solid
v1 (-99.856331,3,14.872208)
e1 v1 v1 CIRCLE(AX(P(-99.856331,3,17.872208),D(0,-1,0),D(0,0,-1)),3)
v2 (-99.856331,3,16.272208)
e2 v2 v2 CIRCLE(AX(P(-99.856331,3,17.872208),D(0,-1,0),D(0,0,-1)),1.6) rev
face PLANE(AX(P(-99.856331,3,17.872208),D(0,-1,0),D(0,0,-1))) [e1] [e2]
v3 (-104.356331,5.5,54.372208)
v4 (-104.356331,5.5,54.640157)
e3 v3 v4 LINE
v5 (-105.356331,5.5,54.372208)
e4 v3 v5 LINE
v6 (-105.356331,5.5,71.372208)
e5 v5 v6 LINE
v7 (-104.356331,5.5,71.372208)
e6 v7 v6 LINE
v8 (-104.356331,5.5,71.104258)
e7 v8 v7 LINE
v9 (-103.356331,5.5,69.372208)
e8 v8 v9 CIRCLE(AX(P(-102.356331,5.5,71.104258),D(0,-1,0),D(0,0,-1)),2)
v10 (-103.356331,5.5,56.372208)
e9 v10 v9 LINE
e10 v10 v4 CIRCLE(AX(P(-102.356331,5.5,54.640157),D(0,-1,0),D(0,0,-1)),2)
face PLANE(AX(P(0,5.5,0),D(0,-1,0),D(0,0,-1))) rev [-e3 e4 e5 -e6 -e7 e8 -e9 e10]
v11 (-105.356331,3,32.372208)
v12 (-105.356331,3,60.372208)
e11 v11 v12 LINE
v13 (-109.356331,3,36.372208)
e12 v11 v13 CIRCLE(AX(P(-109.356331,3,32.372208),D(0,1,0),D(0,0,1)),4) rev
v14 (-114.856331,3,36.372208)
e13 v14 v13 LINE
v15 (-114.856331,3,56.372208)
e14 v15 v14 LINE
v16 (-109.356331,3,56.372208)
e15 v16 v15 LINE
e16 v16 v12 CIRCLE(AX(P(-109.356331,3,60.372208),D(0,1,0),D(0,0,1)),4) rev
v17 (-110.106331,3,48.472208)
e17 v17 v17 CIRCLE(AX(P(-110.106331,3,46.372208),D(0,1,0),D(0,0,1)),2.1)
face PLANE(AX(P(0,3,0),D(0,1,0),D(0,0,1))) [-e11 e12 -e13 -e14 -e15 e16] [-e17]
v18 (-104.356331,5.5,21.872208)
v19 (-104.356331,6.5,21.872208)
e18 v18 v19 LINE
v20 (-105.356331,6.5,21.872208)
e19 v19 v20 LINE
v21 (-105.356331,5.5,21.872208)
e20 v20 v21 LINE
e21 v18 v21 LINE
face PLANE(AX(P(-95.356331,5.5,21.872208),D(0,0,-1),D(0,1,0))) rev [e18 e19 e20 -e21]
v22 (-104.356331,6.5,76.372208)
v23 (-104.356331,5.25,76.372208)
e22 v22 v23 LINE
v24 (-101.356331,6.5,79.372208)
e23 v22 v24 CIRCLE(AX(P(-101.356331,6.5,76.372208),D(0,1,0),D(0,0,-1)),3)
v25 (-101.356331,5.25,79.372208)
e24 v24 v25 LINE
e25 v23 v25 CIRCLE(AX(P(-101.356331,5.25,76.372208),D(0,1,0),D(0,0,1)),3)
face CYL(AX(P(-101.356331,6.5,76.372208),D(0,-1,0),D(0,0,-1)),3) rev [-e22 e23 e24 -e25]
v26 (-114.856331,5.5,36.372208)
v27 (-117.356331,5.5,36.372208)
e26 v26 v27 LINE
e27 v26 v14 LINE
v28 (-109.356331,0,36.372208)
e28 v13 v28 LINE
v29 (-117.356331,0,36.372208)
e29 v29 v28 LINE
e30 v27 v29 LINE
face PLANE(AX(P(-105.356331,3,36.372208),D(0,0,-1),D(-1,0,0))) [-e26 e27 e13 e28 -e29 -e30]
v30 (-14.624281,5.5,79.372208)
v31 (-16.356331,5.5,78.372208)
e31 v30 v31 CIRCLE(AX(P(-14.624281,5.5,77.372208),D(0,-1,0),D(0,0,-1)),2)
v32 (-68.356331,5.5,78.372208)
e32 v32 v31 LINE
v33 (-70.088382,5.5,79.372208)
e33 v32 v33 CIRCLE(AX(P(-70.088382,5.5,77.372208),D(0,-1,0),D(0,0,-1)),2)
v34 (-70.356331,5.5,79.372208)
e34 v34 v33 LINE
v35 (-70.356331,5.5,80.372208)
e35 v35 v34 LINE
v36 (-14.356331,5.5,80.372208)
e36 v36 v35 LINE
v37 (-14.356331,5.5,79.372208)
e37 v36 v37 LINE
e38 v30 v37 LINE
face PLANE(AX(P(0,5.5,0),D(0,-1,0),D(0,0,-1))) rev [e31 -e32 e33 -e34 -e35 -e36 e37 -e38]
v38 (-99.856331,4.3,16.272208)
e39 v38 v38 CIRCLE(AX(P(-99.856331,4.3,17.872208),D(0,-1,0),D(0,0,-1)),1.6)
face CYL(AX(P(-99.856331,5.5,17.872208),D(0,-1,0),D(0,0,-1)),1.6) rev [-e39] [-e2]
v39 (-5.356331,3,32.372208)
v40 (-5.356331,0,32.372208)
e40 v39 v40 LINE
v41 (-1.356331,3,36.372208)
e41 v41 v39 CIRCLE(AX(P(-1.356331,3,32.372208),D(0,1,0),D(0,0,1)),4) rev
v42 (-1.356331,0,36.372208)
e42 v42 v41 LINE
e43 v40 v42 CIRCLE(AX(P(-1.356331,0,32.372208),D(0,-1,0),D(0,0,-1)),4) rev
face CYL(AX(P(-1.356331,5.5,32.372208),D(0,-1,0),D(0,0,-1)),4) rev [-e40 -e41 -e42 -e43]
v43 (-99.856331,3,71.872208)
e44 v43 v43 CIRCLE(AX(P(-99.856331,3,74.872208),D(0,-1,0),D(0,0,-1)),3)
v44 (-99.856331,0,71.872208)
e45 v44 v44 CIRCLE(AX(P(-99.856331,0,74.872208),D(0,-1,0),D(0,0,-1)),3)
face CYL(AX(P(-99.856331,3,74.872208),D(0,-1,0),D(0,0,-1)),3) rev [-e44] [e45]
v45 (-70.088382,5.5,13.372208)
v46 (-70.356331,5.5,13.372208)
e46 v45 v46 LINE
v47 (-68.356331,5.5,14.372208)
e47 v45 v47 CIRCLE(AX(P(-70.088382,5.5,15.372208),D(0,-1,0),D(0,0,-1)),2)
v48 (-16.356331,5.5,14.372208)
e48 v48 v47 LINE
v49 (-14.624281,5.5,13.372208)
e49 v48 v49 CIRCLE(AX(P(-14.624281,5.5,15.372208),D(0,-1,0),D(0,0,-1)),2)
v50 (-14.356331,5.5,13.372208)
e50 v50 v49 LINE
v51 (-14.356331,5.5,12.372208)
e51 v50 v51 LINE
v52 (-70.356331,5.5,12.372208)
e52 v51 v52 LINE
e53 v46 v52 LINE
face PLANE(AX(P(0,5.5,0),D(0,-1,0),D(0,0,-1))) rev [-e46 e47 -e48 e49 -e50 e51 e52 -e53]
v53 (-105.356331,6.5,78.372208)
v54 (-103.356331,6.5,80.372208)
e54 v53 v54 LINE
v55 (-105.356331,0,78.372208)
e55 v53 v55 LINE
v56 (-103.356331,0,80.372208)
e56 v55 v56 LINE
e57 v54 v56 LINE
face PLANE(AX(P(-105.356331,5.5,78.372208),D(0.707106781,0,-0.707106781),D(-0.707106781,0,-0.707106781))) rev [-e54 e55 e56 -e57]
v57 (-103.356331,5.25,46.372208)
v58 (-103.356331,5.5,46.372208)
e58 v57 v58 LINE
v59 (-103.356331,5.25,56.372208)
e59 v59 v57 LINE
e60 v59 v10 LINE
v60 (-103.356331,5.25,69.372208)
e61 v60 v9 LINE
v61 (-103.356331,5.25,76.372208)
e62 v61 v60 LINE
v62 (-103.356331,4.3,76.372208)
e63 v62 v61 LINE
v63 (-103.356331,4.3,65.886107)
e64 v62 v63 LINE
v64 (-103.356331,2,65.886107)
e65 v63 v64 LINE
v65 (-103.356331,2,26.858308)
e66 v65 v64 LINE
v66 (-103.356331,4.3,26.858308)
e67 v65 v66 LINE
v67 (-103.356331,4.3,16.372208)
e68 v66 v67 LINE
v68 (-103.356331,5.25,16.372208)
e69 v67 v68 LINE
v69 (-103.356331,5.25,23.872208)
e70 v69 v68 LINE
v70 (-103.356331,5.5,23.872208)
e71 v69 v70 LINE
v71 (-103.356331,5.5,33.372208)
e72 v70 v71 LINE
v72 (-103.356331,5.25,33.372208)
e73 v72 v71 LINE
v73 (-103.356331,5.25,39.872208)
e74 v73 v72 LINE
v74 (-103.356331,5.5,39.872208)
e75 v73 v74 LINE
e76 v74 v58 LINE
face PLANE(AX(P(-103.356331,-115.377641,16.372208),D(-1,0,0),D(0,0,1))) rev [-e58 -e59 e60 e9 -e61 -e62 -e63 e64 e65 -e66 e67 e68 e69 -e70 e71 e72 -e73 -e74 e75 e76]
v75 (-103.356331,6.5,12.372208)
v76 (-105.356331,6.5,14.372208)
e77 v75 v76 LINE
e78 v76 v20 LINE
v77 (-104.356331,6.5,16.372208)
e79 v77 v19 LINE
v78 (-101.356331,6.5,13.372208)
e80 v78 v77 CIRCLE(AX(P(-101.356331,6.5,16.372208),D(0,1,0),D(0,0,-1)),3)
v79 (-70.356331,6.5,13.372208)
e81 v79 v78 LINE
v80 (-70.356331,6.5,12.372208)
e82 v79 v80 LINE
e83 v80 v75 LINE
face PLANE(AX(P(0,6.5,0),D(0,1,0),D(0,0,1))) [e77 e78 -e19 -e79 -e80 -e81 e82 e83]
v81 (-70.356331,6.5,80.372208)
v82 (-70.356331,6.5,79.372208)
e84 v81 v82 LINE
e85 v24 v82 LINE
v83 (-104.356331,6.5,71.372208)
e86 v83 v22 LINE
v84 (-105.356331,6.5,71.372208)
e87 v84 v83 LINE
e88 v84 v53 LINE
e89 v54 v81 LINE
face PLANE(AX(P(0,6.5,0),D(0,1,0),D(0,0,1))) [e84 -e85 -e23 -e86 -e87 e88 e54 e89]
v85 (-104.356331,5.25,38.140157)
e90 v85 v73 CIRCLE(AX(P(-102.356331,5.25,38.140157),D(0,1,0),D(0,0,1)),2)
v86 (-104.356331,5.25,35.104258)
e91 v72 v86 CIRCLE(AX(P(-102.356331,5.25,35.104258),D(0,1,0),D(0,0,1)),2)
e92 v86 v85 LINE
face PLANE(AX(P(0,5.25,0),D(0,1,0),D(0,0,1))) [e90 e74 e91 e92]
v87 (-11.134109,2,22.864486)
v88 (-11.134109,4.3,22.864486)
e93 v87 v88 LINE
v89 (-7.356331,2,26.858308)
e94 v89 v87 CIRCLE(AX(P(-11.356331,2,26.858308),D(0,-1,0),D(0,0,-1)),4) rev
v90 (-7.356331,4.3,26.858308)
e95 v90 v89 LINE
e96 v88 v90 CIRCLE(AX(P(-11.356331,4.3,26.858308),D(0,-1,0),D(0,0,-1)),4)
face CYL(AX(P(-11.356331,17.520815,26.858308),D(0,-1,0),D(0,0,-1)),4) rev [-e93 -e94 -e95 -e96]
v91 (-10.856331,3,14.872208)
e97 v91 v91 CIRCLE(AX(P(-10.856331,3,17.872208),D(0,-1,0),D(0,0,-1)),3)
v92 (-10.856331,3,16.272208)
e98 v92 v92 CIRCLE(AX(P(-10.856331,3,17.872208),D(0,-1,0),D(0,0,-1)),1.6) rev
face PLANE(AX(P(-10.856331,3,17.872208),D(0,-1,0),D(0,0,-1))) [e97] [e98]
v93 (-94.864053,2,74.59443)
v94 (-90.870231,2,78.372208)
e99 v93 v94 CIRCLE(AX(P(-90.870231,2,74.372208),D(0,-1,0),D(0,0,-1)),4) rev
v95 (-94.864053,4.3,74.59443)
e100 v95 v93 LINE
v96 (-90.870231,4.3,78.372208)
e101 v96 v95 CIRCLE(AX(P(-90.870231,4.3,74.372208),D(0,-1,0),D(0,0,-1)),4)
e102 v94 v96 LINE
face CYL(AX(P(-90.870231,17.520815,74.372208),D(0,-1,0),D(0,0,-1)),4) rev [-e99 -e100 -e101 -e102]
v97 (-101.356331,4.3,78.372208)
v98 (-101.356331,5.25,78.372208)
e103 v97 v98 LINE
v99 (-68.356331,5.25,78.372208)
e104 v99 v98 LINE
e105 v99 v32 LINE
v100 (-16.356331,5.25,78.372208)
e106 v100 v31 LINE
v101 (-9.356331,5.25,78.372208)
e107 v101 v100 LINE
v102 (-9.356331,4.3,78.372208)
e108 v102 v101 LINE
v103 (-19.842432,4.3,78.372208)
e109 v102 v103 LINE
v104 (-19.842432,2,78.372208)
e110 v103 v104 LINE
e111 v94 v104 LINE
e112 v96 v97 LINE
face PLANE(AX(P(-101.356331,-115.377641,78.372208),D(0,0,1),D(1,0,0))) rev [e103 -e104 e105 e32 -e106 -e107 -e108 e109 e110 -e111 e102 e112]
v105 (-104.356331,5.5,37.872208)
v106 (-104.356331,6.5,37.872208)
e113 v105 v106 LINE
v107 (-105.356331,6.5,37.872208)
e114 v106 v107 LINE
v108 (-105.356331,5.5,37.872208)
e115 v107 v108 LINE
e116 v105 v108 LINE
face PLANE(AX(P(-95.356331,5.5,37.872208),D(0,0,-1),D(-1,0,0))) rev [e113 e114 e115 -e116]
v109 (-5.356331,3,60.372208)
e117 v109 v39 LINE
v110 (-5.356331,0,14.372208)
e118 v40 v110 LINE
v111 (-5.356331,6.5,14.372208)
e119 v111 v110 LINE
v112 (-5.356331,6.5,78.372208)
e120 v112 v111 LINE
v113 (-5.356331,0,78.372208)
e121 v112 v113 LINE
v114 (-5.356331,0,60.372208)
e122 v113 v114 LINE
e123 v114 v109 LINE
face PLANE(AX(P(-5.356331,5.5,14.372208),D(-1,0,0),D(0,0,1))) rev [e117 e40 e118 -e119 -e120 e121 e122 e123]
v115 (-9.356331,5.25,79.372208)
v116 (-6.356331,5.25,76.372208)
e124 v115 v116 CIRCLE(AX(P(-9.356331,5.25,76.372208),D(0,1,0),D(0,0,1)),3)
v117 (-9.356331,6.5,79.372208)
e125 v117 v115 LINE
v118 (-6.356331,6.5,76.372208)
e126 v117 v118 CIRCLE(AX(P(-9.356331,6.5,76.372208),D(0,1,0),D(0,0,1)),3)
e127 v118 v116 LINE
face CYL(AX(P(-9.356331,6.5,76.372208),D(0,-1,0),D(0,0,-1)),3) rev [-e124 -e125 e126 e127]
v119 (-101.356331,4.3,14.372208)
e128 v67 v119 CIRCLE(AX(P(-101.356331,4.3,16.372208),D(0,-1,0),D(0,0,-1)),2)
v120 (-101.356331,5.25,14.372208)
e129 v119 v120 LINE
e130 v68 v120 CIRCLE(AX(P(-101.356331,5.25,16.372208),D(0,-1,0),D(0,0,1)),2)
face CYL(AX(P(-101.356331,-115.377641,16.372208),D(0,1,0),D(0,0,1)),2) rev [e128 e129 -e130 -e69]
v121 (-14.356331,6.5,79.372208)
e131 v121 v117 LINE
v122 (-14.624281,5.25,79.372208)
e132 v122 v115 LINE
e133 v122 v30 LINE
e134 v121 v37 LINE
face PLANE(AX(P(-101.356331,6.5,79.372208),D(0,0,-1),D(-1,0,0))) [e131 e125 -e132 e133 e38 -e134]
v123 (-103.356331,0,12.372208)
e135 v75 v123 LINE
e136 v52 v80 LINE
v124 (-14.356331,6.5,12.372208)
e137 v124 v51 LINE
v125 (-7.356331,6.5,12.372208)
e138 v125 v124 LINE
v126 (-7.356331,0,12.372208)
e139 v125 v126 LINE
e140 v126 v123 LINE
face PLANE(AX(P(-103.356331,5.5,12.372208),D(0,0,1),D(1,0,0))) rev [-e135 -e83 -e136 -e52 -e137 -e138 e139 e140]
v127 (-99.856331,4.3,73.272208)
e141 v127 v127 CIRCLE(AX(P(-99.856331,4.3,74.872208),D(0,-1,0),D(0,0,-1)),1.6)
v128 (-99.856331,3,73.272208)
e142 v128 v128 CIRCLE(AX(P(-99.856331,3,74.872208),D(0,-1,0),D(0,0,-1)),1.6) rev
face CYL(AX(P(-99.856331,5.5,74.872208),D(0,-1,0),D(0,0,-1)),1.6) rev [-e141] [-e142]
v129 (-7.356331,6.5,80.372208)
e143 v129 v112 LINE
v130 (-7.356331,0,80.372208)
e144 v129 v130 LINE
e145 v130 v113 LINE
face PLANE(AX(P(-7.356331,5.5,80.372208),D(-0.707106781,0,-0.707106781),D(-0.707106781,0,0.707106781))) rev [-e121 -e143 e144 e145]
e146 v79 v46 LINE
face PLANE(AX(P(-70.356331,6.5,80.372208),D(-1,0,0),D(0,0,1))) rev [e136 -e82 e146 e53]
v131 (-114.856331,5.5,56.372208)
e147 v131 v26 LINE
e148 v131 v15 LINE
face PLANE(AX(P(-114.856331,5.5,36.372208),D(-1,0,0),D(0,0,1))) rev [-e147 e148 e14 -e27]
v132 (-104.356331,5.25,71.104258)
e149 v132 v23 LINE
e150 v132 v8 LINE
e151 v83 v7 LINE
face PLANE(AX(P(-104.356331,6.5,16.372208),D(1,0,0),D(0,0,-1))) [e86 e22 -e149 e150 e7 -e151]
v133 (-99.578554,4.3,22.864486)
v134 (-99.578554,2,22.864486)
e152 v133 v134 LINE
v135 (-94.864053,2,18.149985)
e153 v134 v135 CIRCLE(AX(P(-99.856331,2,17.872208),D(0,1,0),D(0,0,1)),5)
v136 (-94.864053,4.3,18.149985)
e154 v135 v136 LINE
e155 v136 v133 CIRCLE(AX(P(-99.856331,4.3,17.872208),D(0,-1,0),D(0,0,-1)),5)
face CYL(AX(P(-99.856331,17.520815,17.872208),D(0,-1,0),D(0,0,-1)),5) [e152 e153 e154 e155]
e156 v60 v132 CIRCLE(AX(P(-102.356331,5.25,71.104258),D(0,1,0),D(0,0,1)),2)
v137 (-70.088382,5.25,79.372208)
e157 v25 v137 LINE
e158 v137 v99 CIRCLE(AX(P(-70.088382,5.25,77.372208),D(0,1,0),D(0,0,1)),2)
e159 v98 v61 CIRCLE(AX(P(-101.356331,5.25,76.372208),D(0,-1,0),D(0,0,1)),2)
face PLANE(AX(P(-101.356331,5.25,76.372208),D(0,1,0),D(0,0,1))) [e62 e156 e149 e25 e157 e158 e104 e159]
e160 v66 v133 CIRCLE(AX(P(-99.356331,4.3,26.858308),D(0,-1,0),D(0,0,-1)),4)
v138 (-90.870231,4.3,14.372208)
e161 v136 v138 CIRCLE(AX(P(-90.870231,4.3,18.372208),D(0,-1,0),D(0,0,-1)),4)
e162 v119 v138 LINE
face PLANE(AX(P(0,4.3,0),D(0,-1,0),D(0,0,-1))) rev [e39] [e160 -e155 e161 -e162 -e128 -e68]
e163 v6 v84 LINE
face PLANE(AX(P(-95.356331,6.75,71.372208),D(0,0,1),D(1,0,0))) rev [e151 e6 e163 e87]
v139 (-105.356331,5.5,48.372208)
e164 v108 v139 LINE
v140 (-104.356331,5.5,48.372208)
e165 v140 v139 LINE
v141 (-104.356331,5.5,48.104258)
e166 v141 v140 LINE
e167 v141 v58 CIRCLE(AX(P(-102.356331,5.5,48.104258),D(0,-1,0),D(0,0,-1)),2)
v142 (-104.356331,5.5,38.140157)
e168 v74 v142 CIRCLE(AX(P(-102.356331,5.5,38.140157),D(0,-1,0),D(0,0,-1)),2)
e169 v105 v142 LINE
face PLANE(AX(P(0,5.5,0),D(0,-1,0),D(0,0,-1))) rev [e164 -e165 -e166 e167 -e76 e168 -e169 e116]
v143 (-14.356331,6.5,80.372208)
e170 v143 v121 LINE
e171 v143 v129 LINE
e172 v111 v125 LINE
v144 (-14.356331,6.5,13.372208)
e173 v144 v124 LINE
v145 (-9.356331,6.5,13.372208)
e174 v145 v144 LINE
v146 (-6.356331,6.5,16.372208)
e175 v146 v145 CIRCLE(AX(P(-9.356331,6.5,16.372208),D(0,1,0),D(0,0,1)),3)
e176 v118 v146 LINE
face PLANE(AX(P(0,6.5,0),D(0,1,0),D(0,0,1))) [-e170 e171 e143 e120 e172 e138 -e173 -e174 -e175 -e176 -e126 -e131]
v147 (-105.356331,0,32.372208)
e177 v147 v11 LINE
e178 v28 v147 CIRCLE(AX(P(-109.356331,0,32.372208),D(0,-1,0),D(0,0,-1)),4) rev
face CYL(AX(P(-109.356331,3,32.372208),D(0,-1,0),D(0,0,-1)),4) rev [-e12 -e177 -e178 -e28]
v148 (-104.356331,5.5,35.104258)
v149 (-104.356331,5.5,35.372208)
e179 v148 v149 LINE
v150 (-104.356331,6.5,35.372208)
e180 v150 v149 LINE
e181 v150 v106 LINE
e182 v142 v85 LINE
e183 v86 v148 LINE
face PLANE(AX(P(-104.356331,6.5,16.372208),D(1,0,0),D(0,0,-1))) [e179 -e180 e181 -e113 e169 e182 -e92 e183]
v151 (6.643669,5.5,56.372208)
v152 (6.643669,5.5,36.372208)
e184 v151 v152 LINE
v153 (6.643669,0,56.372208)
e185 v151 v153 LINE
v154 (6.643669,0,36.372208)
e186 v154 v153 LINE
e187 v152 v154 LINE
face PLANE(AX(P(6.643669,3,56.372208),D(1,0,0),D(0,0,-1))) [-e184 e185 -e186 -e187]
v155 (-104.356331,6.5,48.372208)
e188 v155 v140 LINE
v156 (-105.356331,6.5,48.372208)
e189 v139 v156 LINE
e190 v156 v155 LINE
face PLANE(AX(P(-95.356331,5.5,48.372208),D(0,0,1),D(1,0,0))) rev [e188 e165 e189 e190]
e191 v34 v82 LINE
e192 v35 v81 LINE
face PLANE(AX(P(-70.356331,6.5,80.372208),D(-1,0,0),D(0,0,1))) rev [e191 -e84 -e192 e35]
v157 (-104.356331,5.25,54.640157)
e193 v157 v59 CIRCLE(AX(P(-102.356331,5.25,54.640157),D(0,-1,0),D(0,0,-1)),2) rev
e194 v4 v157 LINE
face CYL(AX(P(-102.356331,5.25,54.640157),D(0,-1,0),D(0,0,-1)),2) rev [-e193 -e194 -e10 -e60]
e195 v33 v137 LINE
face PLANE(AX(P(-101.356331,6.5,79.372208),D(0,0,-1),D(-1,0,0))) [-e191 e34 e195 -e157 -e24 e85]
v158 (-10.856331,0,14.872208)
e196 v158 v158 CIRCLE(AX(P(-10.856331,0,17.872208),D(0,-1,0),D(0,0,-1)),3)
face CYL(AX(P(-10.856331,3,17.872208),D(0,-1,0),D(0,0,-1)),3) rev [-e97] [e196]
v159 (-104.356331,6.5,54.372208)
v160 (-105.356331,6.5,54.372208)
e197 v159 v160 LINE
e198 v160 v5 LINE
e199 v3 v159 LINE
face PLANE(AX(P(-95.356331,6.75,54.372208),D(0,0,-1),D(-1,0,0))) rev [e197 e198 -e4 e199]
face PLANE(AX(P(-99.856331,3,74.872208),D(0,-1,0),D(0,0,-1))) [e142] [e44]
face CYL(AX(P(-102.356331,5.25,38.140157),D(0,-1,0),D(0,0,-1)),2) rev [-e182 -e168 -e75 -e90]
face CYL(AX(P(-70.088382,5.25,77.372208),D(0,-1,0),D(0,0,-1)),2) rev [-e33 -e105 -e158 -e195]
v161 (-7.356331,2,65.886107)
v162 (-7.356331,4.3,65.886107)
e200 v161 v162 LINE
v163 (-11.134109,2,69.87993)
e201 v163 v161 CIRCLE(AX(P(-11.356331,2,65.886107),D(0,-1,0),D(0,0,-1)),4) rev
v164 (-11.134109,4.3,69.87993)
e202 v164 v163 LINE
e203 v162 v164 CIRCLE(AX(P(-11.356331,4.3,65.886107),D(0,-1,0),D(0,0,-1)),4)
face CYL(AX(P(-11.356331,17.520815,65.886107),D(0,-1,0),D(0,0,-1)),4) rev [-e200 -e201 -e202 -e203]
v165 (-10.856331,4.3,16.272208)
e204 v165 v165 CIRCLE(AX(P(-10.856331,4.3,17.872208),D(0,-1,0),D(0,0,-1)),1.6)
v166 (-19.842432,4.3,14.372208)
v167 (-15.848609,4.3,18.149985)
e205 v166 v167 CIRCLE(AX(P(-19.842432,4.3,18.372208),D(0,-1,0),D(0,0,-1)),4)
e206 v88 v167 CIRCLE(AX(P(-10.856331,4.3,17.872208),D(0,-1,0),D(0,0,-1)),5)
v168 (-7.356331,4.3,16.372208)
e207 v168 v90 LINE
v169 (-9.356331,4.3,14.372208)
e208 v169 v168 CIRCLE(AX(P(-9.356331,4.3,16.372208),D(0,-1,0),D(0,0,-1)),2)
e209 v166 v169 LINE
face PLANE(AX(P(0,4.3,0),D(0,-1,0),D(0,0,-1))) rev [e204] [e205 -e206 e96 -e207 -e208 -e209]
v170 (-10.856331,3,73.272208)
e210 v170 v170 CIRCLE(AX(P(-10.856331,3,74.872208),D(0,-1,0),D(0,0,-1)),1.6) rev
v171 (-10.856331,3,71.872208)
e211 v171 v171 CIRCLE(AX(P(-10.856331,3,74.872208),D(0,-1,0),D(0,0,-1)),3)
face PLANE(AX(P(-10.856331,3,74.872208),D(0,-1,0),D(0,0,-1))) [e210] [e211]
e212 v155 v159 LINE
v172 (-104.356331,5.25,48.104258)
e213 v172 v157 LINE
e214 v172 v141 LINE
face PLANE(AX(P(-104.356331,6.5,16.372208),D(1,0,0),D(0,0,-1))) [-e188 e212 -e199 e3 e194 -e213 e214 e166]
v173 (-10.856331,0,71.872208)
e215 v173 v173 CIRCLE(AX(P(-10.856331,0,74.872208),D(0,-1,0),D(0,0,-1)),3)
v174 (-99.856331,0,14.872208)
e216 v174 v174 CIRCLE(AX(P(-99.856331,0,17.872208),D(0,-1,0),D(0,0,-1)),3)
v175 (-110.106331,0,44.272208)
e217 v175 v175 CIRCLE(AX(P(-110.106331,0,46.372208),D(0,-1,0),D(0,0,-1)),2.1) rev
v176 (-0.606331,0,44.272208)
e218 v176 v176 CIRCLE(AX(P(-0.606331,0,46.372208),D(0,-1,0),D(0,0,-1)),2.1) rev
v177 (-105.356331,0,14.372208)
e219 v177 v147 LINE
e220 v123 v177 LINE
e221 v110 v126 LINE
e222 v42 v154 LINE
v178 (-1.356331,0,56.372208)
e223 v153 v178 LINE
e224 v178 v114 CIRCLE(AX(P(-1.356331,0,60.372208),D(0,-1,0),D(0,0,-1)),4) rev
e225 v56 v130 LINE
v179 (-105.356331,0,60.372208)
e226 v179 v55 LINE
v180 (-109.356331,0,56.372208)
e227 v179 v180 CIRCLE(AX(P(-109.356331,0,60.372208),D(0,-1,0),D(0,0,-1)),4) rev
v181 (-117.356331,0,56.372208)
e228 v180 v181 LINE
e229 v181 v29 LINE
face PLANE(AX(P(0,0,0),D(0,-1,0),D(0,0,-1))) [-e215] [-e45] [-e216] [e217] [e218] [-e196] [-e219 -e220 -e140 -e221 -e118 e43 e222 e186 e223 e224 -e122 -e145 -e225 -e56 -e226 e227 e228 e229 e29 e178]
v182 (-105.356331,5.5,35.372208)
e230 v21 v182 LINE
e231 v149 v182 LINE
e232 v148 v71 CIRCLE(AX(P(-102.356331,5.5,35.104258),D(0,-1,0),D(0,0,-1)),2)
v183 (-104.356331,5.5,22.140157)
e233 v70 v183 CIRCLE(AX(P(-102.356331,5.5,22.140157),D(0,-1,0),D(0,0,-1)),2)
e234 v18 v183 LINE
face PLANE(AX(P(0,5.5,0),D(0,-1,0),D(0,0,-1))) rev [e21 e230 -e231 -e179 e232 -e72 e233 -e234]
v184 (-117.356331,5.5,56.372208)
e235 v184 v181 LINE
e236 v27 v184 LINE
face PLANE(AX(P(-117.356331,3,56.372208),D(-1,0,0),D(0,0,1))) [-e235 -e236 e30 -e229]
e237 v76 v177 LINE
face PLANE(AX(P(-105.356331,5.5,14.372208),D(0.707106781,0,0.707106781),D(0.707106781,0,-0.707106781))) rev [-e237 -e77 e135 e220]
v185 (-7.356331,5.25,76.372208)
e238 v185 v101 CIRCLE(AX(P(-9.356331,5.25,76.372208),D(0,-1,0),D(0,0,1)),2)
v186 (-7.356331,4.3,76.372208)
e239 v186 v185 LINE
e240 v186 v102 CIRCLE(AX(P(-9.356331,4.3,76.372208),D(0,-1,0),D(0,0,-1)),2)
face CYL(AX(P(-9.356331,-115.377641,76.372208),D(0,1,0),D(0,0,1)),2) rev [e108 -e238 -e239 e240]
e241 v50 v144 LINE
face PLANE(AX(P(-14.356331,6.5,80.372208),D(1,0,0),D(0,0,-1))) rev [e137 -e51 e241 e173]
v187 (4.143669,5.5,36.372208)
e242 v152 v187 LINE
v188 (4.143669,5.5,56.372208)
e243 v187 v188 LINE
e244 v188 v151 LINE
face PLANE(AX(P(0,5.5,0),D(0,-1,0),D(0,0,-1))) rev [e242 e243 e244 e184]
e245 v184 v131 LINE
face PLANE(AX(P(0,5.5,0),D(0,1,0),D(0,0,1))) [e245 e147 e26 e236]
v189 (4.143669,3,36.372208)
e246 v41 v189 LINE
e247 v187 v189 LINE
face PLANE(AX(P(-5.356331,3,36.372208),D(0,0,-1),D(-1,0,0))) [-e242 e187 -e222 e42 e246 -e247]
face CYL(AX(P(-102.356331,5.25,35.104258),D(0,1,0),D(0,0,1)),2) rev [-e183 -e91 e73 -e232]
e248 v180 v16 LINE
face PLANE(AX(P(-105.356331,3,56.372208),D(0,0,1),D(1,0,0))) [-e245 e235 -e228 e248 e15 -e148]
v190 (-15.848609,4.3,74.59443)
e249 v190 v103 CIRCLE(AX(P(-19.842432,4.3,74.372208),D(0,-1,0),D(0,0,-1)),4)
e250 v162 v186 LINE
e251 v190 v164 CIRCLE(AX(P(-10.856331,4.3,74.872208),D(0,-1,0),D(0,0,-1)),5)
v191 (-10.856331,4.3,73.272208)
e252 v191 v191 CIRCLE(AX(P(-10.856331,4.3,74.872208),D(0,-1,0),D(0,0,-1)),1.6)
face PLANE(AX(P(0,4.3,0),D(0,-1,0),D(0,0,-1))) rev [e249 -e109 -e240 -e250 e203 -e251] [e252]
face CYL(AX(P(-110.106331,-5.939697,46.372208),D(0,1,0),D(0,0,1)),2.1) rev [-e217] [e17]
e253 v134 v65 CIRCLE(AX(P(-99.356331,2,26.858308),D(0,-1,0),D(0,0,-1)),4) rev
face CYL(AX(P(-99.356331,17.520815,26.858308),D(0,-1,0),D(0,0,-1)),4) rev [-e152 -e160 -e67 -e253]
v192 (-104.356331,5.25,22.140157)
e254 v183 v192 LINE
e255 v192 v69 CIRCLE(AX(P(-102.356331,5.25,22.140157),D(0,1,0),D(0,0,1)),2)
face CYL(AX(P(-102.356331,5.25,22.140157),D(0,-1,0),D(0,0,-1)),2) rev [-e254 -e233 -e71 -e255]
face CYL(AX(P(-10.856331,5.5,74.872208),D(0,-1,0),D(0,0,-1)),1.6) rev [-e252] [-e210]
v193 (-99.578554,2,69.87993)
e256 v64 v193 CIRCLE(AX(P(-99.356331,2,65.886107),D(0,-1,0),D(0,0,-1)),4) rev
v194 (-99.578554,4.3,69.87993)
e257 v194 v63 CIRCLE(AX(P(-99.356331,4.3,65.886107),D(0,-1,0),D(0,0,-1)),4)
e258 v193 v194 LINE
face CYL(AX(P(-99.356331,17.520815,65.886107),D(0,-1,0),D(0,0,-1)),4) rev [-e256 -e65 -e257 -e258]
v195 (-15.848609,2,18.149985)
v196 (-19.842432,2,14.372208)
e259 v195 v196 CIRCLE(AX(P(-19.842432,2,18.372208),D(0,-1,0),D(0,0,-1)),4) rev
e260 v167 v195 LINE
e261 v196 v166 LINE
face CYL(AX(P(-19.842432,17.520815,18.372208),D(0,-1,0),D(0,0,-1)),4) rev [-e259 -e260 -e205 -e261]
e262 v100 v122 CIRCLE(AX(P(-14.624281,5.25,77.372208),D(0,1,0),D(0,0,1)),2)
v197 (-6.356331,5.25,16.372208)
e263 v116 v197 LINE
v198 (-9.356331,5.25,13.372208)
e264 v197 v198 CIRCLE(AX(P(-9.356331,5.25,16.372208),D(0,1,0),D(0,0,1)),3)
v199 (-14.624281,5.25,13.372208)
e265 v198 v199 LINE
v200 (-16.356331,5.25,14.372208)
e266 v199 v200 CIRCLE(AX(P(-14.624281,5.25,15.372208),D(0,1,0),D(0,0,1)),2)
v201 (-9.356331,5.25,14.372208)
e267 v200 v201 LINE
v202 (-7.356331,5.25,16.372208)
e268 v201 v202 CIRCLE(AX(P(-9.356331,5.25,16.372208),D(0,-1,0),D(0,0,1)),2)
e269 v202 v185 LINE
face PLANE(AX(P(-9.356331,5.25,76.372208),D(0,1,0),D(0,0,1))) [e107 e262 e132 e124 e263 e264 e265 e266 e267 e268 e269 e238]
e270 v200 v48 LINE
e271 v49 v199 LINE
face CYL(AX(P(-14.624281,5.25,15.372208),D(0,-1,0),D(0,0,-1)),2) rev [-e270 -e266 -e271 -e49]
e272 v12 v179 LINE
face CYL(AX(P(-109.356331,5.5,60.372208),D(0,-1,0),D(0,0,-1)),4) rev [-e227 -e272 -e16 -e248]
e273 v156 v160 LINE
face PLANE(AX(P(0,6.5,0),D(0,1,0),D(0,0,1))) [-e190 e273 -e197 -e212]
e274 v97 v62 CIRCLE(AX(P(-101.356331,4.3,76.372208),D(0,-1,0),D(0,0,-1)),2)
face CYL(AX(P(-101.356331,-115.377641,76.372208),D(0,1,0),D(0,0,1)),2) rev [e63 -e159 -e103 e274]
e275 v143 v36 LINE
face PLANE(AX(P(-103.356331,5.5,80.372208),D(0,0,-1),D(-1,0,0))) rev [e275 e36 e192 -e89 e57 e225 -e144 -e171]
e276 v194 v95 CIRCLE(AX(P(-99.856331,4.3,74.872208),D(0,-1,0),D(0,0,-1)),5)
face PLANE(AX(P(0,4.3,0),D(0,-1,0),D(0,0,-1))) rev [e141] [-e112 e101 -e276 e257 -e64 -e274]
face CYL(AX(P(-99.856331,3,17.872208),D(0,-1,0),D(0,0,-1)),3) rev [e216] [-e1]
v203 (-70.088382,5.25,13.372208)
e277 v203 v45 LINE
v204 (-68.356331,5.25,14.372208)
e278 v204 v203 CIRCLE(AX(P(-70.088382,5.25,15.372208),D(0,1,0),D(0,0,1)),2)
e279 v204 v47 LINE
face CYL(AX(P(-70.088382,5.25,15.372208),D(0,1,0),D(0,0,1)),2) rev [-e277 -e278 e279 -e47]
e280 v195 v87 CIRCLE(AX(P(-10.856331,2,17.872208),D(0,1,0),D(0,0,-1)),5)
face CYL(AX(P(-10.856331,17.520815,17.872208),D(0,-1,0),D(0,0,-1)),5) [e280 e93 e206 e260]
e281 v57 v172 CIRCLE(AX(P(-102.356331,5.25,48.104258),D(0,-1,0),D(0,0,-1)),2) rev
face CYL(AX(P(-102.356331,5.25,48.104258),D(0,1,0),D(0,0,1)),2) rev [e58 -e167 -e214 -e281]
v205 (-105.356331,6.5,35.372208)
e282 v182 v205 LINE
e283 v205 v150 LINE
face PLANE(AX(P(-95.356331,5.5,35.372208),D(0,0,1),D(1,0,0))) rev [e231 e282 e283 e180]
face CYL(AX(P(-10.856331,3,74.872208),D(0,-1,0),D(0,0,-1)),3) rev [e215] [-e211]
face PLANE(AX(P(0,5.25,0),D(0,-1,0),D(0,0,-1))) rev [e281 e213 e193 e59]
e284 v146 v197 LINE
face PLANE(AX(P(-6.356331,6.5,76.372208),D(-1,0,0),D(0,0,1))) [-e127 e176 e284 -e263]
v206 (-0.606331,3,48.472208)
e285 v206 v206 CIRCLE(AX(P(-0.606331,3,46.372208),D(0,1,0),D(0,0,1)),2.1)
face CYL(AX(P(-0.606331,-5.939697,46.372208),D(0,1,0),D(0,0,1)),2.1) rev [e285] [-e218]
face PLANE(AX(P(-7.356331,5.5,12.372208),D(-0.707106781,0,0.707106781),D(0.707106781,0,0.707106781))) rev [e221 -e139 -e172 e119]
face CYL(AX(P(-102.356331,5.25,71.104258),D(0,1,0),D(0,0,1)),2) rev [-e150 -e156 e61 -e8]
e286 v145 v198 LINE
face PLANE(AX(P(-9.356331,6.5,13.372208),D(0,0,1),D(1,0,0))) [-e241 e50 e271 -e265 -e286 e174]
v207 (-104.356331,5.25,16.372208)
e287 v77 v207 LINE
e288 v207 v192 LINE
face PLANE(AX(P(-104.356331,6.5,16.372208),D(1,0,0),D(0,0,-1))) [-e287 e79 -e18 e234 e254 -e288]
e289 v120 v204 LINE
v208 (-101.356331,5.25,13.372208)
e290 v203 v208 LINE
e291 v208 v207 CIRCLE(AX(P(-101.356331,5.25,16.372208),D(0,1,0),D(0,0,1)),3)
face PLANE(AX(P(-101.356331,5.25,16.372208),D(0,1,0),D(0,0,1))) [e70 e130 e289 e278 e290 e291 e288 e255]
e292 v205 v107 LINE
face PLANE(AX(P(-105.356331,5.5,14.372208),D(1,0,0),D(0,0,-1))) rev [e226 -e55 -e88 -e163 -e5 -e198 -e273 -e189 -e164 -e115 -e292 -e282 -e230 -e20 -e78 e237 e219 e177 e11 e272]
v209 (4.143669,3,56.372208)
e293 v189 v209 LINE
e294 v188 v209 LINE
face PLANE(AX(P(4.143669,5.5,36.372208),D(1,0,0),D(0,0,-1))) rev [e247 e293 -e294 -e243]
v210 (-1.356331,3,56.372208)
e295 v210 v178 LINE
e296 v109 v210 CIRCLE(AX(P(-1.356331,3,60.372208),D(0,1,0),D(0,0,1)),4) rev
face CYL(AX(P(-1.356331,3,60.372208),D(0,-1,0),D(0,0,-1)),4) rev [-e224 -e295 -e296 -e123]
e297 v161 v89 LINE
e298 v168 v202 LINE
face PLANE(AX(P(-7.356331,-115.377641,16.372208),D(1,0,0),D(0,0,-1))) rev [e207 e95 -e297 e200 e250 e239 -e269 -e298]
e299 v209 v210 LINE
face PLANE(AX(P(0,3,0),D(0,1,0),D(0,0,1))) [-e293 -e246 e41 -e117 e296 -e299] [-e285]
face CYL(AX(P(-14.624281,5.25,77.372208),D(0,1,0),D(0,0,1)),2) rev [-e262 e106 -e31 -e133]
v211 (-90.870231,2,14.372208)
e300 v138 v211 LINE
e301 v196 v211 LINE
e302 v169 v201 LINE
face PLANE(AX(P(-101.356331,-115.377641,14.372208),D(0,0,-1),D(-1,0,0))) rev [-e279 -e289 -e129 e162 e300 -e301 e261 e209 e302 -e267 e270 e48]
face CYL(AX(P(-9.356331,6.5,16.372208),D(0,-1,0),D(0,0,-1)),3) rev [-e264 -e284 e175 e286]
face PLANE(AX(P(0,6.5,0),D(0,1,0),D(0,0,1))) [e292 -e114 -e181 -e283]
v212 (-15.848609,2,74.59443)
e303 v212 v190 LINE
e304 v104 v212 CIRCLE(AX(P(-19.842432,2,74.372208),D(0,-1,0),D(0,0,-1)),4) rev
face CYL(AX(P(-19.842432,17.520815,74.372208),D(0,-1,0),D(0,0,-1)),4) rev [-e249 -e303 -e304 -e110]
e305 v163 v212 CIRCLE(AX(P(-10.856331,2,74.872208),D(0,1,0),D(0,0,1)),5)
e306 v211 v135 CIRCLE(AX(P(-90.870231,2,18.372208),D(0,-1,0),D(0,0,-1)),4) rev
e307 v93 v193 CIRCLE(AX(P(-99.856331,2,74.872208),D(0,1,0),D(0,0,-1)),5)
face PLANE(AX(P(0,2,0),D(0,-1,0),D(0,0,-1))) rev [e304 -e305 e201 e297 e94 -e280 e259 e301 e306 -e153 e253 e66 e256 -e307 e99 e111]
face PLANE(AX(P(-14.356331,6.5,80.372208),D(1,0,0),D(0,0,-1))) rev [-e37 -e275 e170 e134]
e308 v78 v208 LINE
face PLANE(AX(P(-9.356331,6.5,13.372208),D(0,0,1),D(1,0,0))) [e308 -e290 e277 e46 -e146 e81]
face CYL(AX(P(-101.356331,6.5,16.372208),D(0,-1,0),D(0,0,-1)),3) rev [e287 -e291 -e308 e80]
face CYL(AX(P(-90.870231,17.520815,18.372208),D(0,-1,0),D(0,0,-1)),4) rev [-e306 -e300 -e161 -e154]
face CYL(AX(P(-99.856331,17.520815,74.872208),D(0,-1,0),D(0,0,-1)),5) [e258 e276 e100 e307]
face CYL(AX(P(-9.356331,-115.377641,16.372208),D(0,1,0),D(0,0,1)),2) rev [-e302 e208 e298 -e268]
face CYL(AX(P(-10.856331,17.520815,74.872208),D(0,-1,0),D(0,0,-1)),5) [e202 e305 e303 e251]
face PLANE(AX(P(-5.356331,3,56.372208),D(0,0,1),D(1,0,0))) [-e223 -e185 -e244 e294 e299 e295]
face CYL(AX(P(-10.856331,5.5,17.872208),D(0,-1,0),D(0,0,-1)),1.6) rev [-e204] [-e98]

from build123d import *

# Parameters (mm, degrees)
BOSS_EXTRUDE1_DEPTH              = 5.5
PCB_BASIN_DEPTH                  = 3.5
PCB_START                        = 2.3
PCB_POSTS_DEPTH                  = 2.3
SKETCH4_R                        = 1.6
SCREW_HOLES_DEPTH                = 133.62691408
SKETCH6_R                        = 3
SCREW_CHAMFER_DEPTH              = 3
LIP_DEPTH                        = 1
BASIN_FILLET_R                   = 4
SKETCH12_W                       = 13.5
SKETCH12_H                       = 1.25
SKETCH12_W_2                     = 10.5
SKETCH12_W_3                     = 17
INTERFACE_CONNECTOR_CUTOUT_DEPTH = 10
SKETCH13_W                       = 56
SKETCH13_H                       = 1
POP_CONNECTOR_CUTOUT_DEPTH       = 126.563555911
CUT_EXTRUDE3_DEPTH               = 0.25
FILLET7_R                        = 2
SKETCH15_W                       = 12
SKETCH15_H                       = 20
MOUNTING_PEGS_DEPTH              = 3
MOUNTING_PEGS_FILLET_R           = 4
MOUNTING_PEG_LIPS_W              = 2.5
MOUNTING_PEG_LIPS_H              = 20
BOSS_EXTRUDE3_DEPTH              = 2.5
SKETCH17_R                       = 2.1
CUT_EXTRUDE4_DEPTH               = 3


with BuildPart() as part:
    # Sketch1 → Boss-Extrude1 (new body)
    with BuildSketch(Plane(origin=(0, 0, 0), x_dir=(1, 0, 0), z_dir=(0, 1, 0))):
        Polygon((-105.356331433, -14.372207668), (-103.356331433, -12.372207668), (-7.356331433, -12.372207668), (-5.356331433, -14.372207668), (-5.356331433, -78.372207668), (-7.356331433, -80.372207668), (-103.356331433, -80.372207668), (-105.356331433, -78.372207668), align=None)
    extrude(amount=BOSS_EXTRUDE1_DEPTH)

    # Sketch2 → pcb basin (cut)
    with BuildSketch(Plane(origin=(0, 5.5, 0), x_dir=(1, 0, 0), z_dir=(0, 1, 0))):
        with BuildLine():
            Line((-101.356331433, -14.372207668), (-9.356331433, -14.372207668))
            ThreePointArc((-9.356331433, -14.372207668), (-7.942117871, -14.957994106), (-7.356331433, -16.372207668))
            Line((-7.356331433, -16.372207668), (-7.356331433, -76.372207668))
            ThreePointArc((-7.356331433, -76.372207668), (-7.942117871, -77.78642123), (-9.356331433, -78.372207668))
            Line((-9.356331433, -78.372207668), (-101.356331433, -78.372207668))
            ThreePointArc((-101.356331433, -78.372207668), (-102.770544996, -77.78642123), (-103.356331433, -76.372207668))
            Line((-103.356331433, -76.372207668), (-103.356331433, -16.372207668))
            ThreePointArc((-103.356331433, -16.372207668), (-102.770544996, -14.957994106), (-101.356331433, -14.372207668))
        make_face()
    extrude(amount=-PCB_BASIN_DEPTH, mode=Mode.SUBTRACT)

    # Sketch3 → pcb posts (add)
    with BuildSketch(Plane(origin=(0, 2, 0), x_dir=(1, 0, 0), z_dir=(0, 1, 0)).offset(PCB_START)):
        with BuildLine():
            Line((-103.356331433, -69.872207668), (-99.856331433, -69.872207668))
            ThreePointArc((-99.856331433, -69.872207668), (-96.320797527, -71.336673762), (-94.856331433, -74.872207668))
            Line((-94.856331433, -74.872207668), (-94.856331433, -78.372207668))
            Line((-94.856331433, -78.372207668), (-101.356331433, -78.372207668))
            ThreePointArc((-101.356331433, -78.372207668), (-102.770544996, -77.78642123), (-103.356331433, -76.372207668))
            Line((-103.356331433, -76.372207668), (-103.356331433, -69.872207668))
        make_face()
        with BuildLine():
            Line((-7.356331433, -69.872207668), (-7.356331433, -76.372207668))
            ThreePointArc((-7.356331433, -76.372207668), (-7.942117871, -77.78642123), (-9.356331433, -78.372207668))
            Line((-9.356331433, -78.372207668), (-15.856331433, -78.372207668))
            Line((-15.856331433, -78.372207668), (-15.856331433, -74.872207668))
            ThreePointArc((-15.856331433, -74.872207668), (-14.391865339, -71.336673762), (-10.856331433, -69.872207668))
            Line((-10.856331433, -69.872207668), (-7.356331433, -69.872207668))
        make_face()
        with BuildLine():
            Line((-7.356331433, -22.872207668), (-10.856331433, -22.872207668))
            ThreePointArc((-10.856331433, -22.872207668), (-14.391865339, -21.407741574), (-15.856331433, -17.872207668))
            Line((-15.856331433, -17.872207668), (-15.856331433, -14.372207668))
            Line((-15.856331433, -14.372207668), (-9.356331433, -14.372207668))
            ThreePointArc((-9.356331433, -14.372207668), (-7.942117871, -14.957994106), (-7.356331433, -16.372207668))
            Line((-7.356331433, -16.372207668), (-7.356331433, -22.872207668))
        make_face()
        with BuildLine():
            Line((-103.356331433, -22.872207668), (-103.356331433, -16.372207668))
            ThreePointArc((-103.356331433, -16.372207668), (-102.770544996, -14.957994106), (-101.356331433, -14.372207668))
            Line((-101.356331433, -14.372207668), (-94.856331433, -14.372207668))
            Line((-94.856331433, -14.372207668), (-94.856331433, -17.872207668))
            ThreePointArc((-94.856331433, -17.872207668), (-96.320797527, -21.407741574), (-99.856331433, -22.872207668))
            Line((-99.856331433, -22.872207668), (-103.356331433, -22.872207668))
        make_face()
    extrude(amount=-PCB_POSTS_DEPTH)

    # Sketch4 → screw holes (cut, through all)
    with BuildSketch(Plane.XZ):
        with Locations(Location((-99.856331433, 17.872207668, 0), (0, 0, 270))):
            Circle(SKETCH4_R)
        with Locations(Location((-10.856331433, 17.872207668, 0), (0, 0, 270))):
            Circle(SKETCH4_R)
        with Locations(Location((-10.856331433, 74.872207668, 0), (0, 0, 270))):
            Circle(SKETCH4_R)
        with Locations(Location((-99.856331433, 74.872207668, 0), (0, 0, 270))):
            Circle(SKETCH4_R)
    extrude(amount=-SCREW_HOLES_DEPTH, mode=Mode.SUBTRACT)

    # Sketch6 → screw chamfer (cut)
    with BuildSketch(Plane.XZ):
        with Locations(Location((-99.856331433, 17.872207668, 0), (0, 0, 270))):
            Circle(SKETCH6_R)
        with Locations(Location((-10.856331433, 17.872207668, 0), (0, 0, 270))):
            Circle(SKETCH6_R)
        with Locations(Location((-10.856331433, 74.872207668, 0), (0, 0, 270))):
            Circle(SKETCH6_R)
        with Locations(Location((-99.856331433, 74.872207668, 0), (0, 0, 270))):
            Circle(SKETCH6_R)
    extrude(amount=-SCREW_CHAMFER_DEPTH, mode=Mode.SUBTRACT)

    # Sketch11 → lip (add)
    with BuildSketch(Plane(origin=(0, 5.5, 0), x_dir=(1, 0, 0), z_dir=(0, 1, 0))):
        Polygon((-7.356331433, -12.372207668), (-103.356331433, -12.372207668), (-105.356331433, -14.372207668), (-105.356331433, -78.372207668), (-103.356331433, -80.372207668), (-7.356331433, -80.372207668), (-5.356331433, -78.372207668), (-5.356331433, -14.372207668), align=None)
        with BuildLine():
            Line((-9.356331433, -13.372207668), (-101.356331433, -13.372207668))
            ThreePointArc((-101.356331433, -13.372207668), (-103.477651777, -14.250887324), (-104.356331433, -16.372207668))
            Line((-104.356331433, -16.372207668), (-104.356331433, -76.372207668))
            ThreePointArc((-104.356331433, -76.372207668), (-103.477651777, -78.493528012), (-101.356331433, -79.372207668))
            Line((-101.356331433, -79.372207668), (-9.356331433, -79.372207668))
            ThreePointArc((-9.356331433, -79.372207668), (-7.23501109, -78.493528012), (-6.356331433, -76.372207668))
            Line((-6.356331433, -76.372207668), (-6.356331433, -16.372207668))
            ThreePointArc((-6.356331433, -16.372207668), (-7.23501109, -14.250887324), (-9.356331433, -13.372207668))
        make_face(mode=Mode.SUBTRACT)
    extrude(amount=LIP_DEPTH)

    # basin fillet
    # the kernel refuses this fillet: 4 mm, written as the material it adds along each edge
    with BuildSketch(Plane(origin=(-94.856331433, 4.3, 78.372207668), x_dir=(1, 0, 0), z_dir=(0, -1, 0)), Plane(origin=(-7.356331433, 4.3, 69.872207668), x_dir=(0, 0, -1), z_dir=(0, -1, 0))) as basin_fillet_piece_1:
        with BuildLine():
            CenterArc((3.986100378, -4), BASIN_FILLET_R, 90, 86.815261463)
            Line((-0.007722012, -3.777777778), (-0.407104251, -3.755555556))
            ThreePointArc((-0.407104251, -3.755555556), (-0.4, -3.5), (-0.4, 0))
            Line((-0.4, 0), (0, 0.4))
            Line((0, 0.4), (3.986100378, 0.4))
            Line((3.986100378, 0.4), (3.986100378, 0))
        make_face()
    extrude(amount=2.3)
    with BuildSketch(Plane(origin=(-103.356331433, 4.3, 69.872207668), x_dir=(0.9999979109116379, 0, 0.0020440578171697465), z_dir=(0, -1, 0)), Plane(origin=(-15.856331433, 4.3, 78.372207668), x_dir=(0.002044057817168806, 0, -0.9999979109116378), z_dir=(0, -1, 0)), Plane(origin=(-7.356331433, 4.3, 22.872207668), x_dir=(-0.9999979109116378, 0, -0.0020440578171688124), z_dir=(0, -1, 0)), Plane(origin=(-94.856331433, 4.3, 14.372207668), x_dir=(-0.0020440578171697444, 0, 0.9999979109116378), z_dir=(0, -1, 0))) as basin_fillet_piece_2:
        with BuildLine():
            CenterArc((3.991843824, -3.994268282), BASIN_FILLET_R, 93.067622569, 86.815261463)
            Line((-0.00814782, -3.98609205), (-0.408146984, -3.985274427))
            Line((-0.408146984, -3.985274427), (-0.399999164, 0.000817623))
            Line((-0.399999164, 0.000817623), (0.000817623, 0.399999164))
            ThreePointArc((0.000817623, 0.399999164), (3.500810311, 0.392844962), (3.756379854, 0.399426828))
            Line((3.756379854, 0.399426828), (3.77778567, 0))
        make_face()
    extrude(amount=2.3)
    with BuildSketch(Plane(origin=(-15.856331433, 4.3, 14.372207668), x_dir=(0.002044057817168806, 0, 0.9999979109116378), z_dir=(0, -1, 0)), Plane(origin=(-103.356331433, 4.3, 22.872207668), x_dir=(0.9999979109116379, 0, -0.002044057817168806), z_dir=(0, -1, 0))) as basin_fillet_piece_3:
        with BuildLine():
            CenterArc((3.991843824, 3.994268282), BASIN_FILLET_R, 180.117115968, 86.815261463)
            Line((-0.00814782, 3.98609205), (-0.408146984, 3.985274427))
            Line((-0.408146984, 3.985274427), (-0.399999164, -0.000817623))
            Line((-0.399999164, -0.000817623), (0.000817623, -0.399999164))
            ThreePointArc((0.000817623, -0.399999164), (3.500810311, -0.392844962), (3.756379854, -0.399426828))
            Line((3.756379854, -0.399426828), (3.77778567, 0))
        make_face()
    extrude(amount=2.3)

    # Sketch12 → interface connector cutout (cut)
    with BuildSketch(Plane.ZY.offset(105.356331433)):
        with Locations((28.622207668, 6.125)):
            Rectangle(SKETCH12_W, SKETCH12_H)
        with Locations((43.122207668, 6.125)):
            Rectangle(SKETCH12_W_2, SKETCH12_H)
        with Locations((62.872207668, 6.125)):
            Rectangle(SKETCH12_W_3, SKETCH12_H)
    extrude(amount=-INTERFACE_CONNECTOR_CUTOUT_DEPTH, mode=Mode.SUBTRACT)

    # Sketch13 → pop connector cutout (cut, through all)
    with BuildSketch(Plane(origin=(0, 0, 12.372207668), x_dir=(-1, 0, 0), z_dir=(0, 0, -1))):
        with Locations((42.356331433, 6)):
            Rectangle(SKETCH13_W, SKETCH13_H)
    extrude(amount=-POP_CONNECTOR_CUTOUT_DEPTH, mode=Mode.SUBTRACT)

    # Sketch14 → Cut-Extrude3 (cut)
    with BuildSketch(Plane(origin=(0, 5.5, 0), x_dir=(1, 0, 0), z_dir=(0, 1, 0))):
        Polygon((-103.356331433, -37.872207668), (-103.356331433, -39.872207668), (-104.356331433, -39.872207668), (-104.356331433, -37.872207668), (-104.356331433, -35.372207668), (-104.356331433, -33.372207668), (-103.356331433, -33.372207668), (-103.356331433, -35.372207668), align=None)
        with BuildLine():
            Line((-9.356331433, -14.372207668), (-14.356331433, -14.372207668))
            Line((-14.356331433, -14.372207668), (-16.356331433, -14.372207668))
            Line((-16.356331433, -14.372207668), (-16.356331433, -13.372207668))
            Line((-16.356331433, -13.372207668), (-14.356331433, -13.372207668))
            Line((-14.356331433, -13.372207668), (-9.356331433, -13.372207668))
            ThreePointArc((-9.356331433, -13.372207668), (-7.23501109, -14.250887324), (-6.356331433, -16.372207668))
            Line((-6.356331433, -16.372207668), (-6.356331433, -76.372207668))
            ThreePointArc((-6.356331433, -76.372207668), (-7.23501109, -78.493528012), (-9.356331433, -79.372207668))
            Line((-9.356331433, -79.372207668), (-14.356331433, -79.372207668))
            Line((-14.356331433, -79.372207668), (-16.356331433, -79.372207668))
            Line((-16.356331433, -79.372207668), (-16.356331433, -78.372207668))
            Line((-16.356331433, -78.372207668), (-14.356331433, -78.372207668))
            Line((-14.356331433, -78.372207668), (-9.356331433, -78.372207668))
            ThreePointArc((-9.356331433, -78.372207668), (-7.942117871, -77.78642123), (-7.356331433, -76.372207668))
            Line((-7.356331433, -76.372207668), (-7.356331433, -16.372207668))
            ThreePointArc((-7.356331433, -16.372207668), (-7.942117871, -14.957994106), (-9.356331433, -14.372207668))
        make_face()
        with BuildLine():
            Line((-101.356331433, -78.372207668), (-70.356331433, -78.372207668))
            Line((-70.356331433, -78.372207668), (-68.356331433, -78.372207668))
            Line((-68.356331433, -78.372207668), (-68.356331433, -79.372207668))
            Line((-68.356331433, -79.372207668), (-70.356331433, -79.372207668))
            Line((-70.356331433, -79.372207668), (-101.356331433, -79.372207668))
            ThreePointArc((-101.356331433, -79.372207668), (-103.477651777, -78.493528012), (-104.356331433, -76.372207668))
            Line((-104.356331433, -76.372207668), (-104.356331433, -71.372207668))
            Line((-104.356331433, -71.372207668), (-104.356331433, -69.372207668))
            Line((-104.356331433, -69.372207668), (-103.356331433, -69.372207668))
            Line((-103.356331433, -69.372207668), (-103.356331433, -71.372207668))
            Line((-103.356331433, -71.372207668), (-103.356331433, -76.372207668))
            ThreePointArc((-103.356331433, -76.372207668), (-102.770544996, -77.78642123), (-101.356331433, -78.372207668))
        make_face()
        with BuildLine():
            Line((-103.356331433, -16.372207668), (-103.356331433, -21.872207668))
            Line((-103.356331433, -21.872207668), (-103.356331433, -23.872207668))
            Line((-103.356331433, -23.872207668), (-104.356331433, -23.872207668))
            Line((-104.356331433, -23.872207668), (-104.356331433, -21.872207668))
            Line((-104.356331433, -21.872207668), (-104.356331433, -16.372207668))
            ThreePointArc((-104.356331433, -16.372207668), (-103.477651777, -14.250887324), (-101.356331433, -13.372207668))
            Line((-101.356331433, -13.372207668), (-70.356331433, -13.372207668))
            Line((-70.356331433, -13.372207668), (-68.356331433, -13.372207668))
            Line((-68.356331433, -13.372207668), (-68.356331433, -14.372207668))
            Line((-68.356331433, -14.372207668), (-70.356331433, -14.372207668))
            Line((-70.356331433, -14.372207668), (-101.356331433, -14.372207668))
            ThreePointArc((-101.356331433, -14.372207668), (-102.770544996, -14.957994106), (-103.356331433, -16.372207668))
        make_face()
        Polygon((-103.356331433, -48.372207668), (-103.356331433, -54.372207668), (-103.356331433, -56.372207668), (-104.356331433, -56.372207668), (-104.356331433, -54.372207668), (-104.356331433, -48.372207668), (-104.356331433, -46.372207668), (-103.356331433, -46.372207668), align=None)
    extrude(amount=-CUT_EXTRUDE3_DEPTH, mode=Mode.SUBTRACT)

    # Fillet7
    # the kernel refuses this fillet: 2 mm, written as the material it adds along each edge
    with BuildSketch(Plane(origin=(-68.356331433, 5.5, 79.372207668), x_dir=(-1, 0, 0), z_dir=(0, -1, 0)), Plane(origin=(-16.356331433, 5.5, 13.372207668), x_dir=(1, 0, 0), z_dir=(0, -1, 0))) as fillet7_piece_1:
        with BuildLine():
            CenterArc((1.732050808, 2), FILLET7_R, 210, 60)
            Line((0, 1), (-0.034641016, 0.98))
            ThreePointArc((-0.034641016, 0.98), (-0.04, 0.5), (-0.04, 0))
            Line((-0.04, 0), (0, -0.04))
            Line((0, -0.04), (1.732050808, -0.04))
            Line((1.732050808, -0.04), (1.732050808, 0))
        make_face()
    extrude(amount=4.580127019)
    with BuildSketch(Plane(origin=(-16.356331433, 5.5, 79.372207668), x_dir=(0, 0, -1), z_dir=(0, -1, 0)), Plane(origin=(-68.356331433, 5.5, 13.372207668), x_dir=(0, 0, 1), z_dir=(0, -1, 0)), Plane(origin=(-104.356331433, 5.5, 69.372207668), x_dir=(1, 0, 0), z_dir=(0, -1, 0)), Plane(origin=(-104.356331433, 5.5, 46.372207668), x_dir=(1, 0, 0), z_dir=(0, -1, 0)), Plane(origin=(-104.356331433, 5.5, 33.372207668), x_dir=(1, 0, 0), z_dir=(0, -1, 0))) as fillet7_piece_2:
        with BuildLine():
            CenterArc((2, 1.732050808), FILLET7_R, 180, 60)
            Line((0, 1.732050808), (-0.04, 1.732050808))
            Line((-0.04, 1.732050808), (-0.04, 0))
            Line((-0.04, 0), (0, -0.04))
            ThreePointArc((0, -0.04), (0.5, -0.04), (0.98, -0.034641016))
            Line((0.98, -0.034641016), (1, 0))
        make_face()
    extrude(amount=4.580127019)
    with BuildSketch(Plane(origin=(-104.356331433, 5.5, 23.872207668), x_dir=(1, 0, 0), z_dir=(0, -1, 0)), Plane(origin=(-104.356331433, 5.5, 56.372207668), x_dir=(1, 0, 0), z_dir=(0, -1, 0)), Plane(origin=(-104.356331433, 5.5, 39.872207668), x_dir=(1, 0, 0), z_dir=(0, -1, 0))) as fillet7_piece_3:
        with BuildLine():
            CenterArc((2, -1.732050808), FILLET7_R, 120, 60)
            Line((0, -1.732050808), (-0.04, -1.732050808))
            Line((-0.04, -1.732050808), (-0.04, 0))
            Line((-0.04, 0), (0, 0.04))
            ThreePointArc((0, 0.04), (0.5, 0.04), (0.98, 0.034641016))
            Line((0.98, 0.034641016), (1, 0))
        make_face()
    extrude(amount=4.580127019)

    # Sketch15 → mounting pegs (add)
    with BuildSketch(Plane.XZ):
        with Locations((-111.356331433, 46.372207668)):
            Rectangle(SKETCH15_W, SKETCH15_H)
        with Locations((0.643668567, 46.372207668)):
            Rectangle(SKETCH15_W, SKETCH15_H)
    extrude(amount=-MOUNTING_PEGS_DEPTH)

    # mounting pegs fillet
    mounting_pegs_fillet_edges = [part.edges().sort_by_distance(p)[0] for p in [
        (-105.356331433, 1.5, 56.372207668),
        (-105.356331433, 1.5, 36.372207668),
        (-5.356331433, 1.5, 36.372207668),
        (-5.356331433, 1.5, 56.372207668),
    ]]
    fillet(mounting_pegs_fillet_edges, radius=MOUNTING_PEGS_FILLET_R)

    # mounting peg lips → Boss-Extrude3 (add)
    with BuildSketch(Plane(origin=(0, 3, 0), x_dir=(1, 0, 0), z_dir=(0, 1, 0))):
        with Locations((-116.106331433, -46.372207668)):
            Rectangle(MOUNTING_PEG_LIPS_W, MOUNTING_PEG_LIPS_H)
        with Locations((5.393668567, -46.372207668)):
            Rectangle(MOUNTING_PEG_LIPS_W, MOUNTING_PEG_LIPS_H)
    extrude(amount=BOSS_EXTRUDE3_DEPTH)

    # Sketch17 → Cut-Extrude4 (cut)
    with BuildSketch(Plane(origin=(0, 3, 0), x_dir=(1, 0, 0), z_dir=(0, 1, 0))):
        with Locations(Location((-110.106331433, -46.372207668, 0), (0, 0, 270))):
            Circle(SKETCH17_R)
        with Locations(Location((-0.606331433, -46.372207668, 0), (0, 0, 270))):
            Circle(SKETCH17_R)
    extrude(amount=-CUT_EXTRUDE4_DEPTH, mode=Mode.SUBTRACT)


solid = part.part
